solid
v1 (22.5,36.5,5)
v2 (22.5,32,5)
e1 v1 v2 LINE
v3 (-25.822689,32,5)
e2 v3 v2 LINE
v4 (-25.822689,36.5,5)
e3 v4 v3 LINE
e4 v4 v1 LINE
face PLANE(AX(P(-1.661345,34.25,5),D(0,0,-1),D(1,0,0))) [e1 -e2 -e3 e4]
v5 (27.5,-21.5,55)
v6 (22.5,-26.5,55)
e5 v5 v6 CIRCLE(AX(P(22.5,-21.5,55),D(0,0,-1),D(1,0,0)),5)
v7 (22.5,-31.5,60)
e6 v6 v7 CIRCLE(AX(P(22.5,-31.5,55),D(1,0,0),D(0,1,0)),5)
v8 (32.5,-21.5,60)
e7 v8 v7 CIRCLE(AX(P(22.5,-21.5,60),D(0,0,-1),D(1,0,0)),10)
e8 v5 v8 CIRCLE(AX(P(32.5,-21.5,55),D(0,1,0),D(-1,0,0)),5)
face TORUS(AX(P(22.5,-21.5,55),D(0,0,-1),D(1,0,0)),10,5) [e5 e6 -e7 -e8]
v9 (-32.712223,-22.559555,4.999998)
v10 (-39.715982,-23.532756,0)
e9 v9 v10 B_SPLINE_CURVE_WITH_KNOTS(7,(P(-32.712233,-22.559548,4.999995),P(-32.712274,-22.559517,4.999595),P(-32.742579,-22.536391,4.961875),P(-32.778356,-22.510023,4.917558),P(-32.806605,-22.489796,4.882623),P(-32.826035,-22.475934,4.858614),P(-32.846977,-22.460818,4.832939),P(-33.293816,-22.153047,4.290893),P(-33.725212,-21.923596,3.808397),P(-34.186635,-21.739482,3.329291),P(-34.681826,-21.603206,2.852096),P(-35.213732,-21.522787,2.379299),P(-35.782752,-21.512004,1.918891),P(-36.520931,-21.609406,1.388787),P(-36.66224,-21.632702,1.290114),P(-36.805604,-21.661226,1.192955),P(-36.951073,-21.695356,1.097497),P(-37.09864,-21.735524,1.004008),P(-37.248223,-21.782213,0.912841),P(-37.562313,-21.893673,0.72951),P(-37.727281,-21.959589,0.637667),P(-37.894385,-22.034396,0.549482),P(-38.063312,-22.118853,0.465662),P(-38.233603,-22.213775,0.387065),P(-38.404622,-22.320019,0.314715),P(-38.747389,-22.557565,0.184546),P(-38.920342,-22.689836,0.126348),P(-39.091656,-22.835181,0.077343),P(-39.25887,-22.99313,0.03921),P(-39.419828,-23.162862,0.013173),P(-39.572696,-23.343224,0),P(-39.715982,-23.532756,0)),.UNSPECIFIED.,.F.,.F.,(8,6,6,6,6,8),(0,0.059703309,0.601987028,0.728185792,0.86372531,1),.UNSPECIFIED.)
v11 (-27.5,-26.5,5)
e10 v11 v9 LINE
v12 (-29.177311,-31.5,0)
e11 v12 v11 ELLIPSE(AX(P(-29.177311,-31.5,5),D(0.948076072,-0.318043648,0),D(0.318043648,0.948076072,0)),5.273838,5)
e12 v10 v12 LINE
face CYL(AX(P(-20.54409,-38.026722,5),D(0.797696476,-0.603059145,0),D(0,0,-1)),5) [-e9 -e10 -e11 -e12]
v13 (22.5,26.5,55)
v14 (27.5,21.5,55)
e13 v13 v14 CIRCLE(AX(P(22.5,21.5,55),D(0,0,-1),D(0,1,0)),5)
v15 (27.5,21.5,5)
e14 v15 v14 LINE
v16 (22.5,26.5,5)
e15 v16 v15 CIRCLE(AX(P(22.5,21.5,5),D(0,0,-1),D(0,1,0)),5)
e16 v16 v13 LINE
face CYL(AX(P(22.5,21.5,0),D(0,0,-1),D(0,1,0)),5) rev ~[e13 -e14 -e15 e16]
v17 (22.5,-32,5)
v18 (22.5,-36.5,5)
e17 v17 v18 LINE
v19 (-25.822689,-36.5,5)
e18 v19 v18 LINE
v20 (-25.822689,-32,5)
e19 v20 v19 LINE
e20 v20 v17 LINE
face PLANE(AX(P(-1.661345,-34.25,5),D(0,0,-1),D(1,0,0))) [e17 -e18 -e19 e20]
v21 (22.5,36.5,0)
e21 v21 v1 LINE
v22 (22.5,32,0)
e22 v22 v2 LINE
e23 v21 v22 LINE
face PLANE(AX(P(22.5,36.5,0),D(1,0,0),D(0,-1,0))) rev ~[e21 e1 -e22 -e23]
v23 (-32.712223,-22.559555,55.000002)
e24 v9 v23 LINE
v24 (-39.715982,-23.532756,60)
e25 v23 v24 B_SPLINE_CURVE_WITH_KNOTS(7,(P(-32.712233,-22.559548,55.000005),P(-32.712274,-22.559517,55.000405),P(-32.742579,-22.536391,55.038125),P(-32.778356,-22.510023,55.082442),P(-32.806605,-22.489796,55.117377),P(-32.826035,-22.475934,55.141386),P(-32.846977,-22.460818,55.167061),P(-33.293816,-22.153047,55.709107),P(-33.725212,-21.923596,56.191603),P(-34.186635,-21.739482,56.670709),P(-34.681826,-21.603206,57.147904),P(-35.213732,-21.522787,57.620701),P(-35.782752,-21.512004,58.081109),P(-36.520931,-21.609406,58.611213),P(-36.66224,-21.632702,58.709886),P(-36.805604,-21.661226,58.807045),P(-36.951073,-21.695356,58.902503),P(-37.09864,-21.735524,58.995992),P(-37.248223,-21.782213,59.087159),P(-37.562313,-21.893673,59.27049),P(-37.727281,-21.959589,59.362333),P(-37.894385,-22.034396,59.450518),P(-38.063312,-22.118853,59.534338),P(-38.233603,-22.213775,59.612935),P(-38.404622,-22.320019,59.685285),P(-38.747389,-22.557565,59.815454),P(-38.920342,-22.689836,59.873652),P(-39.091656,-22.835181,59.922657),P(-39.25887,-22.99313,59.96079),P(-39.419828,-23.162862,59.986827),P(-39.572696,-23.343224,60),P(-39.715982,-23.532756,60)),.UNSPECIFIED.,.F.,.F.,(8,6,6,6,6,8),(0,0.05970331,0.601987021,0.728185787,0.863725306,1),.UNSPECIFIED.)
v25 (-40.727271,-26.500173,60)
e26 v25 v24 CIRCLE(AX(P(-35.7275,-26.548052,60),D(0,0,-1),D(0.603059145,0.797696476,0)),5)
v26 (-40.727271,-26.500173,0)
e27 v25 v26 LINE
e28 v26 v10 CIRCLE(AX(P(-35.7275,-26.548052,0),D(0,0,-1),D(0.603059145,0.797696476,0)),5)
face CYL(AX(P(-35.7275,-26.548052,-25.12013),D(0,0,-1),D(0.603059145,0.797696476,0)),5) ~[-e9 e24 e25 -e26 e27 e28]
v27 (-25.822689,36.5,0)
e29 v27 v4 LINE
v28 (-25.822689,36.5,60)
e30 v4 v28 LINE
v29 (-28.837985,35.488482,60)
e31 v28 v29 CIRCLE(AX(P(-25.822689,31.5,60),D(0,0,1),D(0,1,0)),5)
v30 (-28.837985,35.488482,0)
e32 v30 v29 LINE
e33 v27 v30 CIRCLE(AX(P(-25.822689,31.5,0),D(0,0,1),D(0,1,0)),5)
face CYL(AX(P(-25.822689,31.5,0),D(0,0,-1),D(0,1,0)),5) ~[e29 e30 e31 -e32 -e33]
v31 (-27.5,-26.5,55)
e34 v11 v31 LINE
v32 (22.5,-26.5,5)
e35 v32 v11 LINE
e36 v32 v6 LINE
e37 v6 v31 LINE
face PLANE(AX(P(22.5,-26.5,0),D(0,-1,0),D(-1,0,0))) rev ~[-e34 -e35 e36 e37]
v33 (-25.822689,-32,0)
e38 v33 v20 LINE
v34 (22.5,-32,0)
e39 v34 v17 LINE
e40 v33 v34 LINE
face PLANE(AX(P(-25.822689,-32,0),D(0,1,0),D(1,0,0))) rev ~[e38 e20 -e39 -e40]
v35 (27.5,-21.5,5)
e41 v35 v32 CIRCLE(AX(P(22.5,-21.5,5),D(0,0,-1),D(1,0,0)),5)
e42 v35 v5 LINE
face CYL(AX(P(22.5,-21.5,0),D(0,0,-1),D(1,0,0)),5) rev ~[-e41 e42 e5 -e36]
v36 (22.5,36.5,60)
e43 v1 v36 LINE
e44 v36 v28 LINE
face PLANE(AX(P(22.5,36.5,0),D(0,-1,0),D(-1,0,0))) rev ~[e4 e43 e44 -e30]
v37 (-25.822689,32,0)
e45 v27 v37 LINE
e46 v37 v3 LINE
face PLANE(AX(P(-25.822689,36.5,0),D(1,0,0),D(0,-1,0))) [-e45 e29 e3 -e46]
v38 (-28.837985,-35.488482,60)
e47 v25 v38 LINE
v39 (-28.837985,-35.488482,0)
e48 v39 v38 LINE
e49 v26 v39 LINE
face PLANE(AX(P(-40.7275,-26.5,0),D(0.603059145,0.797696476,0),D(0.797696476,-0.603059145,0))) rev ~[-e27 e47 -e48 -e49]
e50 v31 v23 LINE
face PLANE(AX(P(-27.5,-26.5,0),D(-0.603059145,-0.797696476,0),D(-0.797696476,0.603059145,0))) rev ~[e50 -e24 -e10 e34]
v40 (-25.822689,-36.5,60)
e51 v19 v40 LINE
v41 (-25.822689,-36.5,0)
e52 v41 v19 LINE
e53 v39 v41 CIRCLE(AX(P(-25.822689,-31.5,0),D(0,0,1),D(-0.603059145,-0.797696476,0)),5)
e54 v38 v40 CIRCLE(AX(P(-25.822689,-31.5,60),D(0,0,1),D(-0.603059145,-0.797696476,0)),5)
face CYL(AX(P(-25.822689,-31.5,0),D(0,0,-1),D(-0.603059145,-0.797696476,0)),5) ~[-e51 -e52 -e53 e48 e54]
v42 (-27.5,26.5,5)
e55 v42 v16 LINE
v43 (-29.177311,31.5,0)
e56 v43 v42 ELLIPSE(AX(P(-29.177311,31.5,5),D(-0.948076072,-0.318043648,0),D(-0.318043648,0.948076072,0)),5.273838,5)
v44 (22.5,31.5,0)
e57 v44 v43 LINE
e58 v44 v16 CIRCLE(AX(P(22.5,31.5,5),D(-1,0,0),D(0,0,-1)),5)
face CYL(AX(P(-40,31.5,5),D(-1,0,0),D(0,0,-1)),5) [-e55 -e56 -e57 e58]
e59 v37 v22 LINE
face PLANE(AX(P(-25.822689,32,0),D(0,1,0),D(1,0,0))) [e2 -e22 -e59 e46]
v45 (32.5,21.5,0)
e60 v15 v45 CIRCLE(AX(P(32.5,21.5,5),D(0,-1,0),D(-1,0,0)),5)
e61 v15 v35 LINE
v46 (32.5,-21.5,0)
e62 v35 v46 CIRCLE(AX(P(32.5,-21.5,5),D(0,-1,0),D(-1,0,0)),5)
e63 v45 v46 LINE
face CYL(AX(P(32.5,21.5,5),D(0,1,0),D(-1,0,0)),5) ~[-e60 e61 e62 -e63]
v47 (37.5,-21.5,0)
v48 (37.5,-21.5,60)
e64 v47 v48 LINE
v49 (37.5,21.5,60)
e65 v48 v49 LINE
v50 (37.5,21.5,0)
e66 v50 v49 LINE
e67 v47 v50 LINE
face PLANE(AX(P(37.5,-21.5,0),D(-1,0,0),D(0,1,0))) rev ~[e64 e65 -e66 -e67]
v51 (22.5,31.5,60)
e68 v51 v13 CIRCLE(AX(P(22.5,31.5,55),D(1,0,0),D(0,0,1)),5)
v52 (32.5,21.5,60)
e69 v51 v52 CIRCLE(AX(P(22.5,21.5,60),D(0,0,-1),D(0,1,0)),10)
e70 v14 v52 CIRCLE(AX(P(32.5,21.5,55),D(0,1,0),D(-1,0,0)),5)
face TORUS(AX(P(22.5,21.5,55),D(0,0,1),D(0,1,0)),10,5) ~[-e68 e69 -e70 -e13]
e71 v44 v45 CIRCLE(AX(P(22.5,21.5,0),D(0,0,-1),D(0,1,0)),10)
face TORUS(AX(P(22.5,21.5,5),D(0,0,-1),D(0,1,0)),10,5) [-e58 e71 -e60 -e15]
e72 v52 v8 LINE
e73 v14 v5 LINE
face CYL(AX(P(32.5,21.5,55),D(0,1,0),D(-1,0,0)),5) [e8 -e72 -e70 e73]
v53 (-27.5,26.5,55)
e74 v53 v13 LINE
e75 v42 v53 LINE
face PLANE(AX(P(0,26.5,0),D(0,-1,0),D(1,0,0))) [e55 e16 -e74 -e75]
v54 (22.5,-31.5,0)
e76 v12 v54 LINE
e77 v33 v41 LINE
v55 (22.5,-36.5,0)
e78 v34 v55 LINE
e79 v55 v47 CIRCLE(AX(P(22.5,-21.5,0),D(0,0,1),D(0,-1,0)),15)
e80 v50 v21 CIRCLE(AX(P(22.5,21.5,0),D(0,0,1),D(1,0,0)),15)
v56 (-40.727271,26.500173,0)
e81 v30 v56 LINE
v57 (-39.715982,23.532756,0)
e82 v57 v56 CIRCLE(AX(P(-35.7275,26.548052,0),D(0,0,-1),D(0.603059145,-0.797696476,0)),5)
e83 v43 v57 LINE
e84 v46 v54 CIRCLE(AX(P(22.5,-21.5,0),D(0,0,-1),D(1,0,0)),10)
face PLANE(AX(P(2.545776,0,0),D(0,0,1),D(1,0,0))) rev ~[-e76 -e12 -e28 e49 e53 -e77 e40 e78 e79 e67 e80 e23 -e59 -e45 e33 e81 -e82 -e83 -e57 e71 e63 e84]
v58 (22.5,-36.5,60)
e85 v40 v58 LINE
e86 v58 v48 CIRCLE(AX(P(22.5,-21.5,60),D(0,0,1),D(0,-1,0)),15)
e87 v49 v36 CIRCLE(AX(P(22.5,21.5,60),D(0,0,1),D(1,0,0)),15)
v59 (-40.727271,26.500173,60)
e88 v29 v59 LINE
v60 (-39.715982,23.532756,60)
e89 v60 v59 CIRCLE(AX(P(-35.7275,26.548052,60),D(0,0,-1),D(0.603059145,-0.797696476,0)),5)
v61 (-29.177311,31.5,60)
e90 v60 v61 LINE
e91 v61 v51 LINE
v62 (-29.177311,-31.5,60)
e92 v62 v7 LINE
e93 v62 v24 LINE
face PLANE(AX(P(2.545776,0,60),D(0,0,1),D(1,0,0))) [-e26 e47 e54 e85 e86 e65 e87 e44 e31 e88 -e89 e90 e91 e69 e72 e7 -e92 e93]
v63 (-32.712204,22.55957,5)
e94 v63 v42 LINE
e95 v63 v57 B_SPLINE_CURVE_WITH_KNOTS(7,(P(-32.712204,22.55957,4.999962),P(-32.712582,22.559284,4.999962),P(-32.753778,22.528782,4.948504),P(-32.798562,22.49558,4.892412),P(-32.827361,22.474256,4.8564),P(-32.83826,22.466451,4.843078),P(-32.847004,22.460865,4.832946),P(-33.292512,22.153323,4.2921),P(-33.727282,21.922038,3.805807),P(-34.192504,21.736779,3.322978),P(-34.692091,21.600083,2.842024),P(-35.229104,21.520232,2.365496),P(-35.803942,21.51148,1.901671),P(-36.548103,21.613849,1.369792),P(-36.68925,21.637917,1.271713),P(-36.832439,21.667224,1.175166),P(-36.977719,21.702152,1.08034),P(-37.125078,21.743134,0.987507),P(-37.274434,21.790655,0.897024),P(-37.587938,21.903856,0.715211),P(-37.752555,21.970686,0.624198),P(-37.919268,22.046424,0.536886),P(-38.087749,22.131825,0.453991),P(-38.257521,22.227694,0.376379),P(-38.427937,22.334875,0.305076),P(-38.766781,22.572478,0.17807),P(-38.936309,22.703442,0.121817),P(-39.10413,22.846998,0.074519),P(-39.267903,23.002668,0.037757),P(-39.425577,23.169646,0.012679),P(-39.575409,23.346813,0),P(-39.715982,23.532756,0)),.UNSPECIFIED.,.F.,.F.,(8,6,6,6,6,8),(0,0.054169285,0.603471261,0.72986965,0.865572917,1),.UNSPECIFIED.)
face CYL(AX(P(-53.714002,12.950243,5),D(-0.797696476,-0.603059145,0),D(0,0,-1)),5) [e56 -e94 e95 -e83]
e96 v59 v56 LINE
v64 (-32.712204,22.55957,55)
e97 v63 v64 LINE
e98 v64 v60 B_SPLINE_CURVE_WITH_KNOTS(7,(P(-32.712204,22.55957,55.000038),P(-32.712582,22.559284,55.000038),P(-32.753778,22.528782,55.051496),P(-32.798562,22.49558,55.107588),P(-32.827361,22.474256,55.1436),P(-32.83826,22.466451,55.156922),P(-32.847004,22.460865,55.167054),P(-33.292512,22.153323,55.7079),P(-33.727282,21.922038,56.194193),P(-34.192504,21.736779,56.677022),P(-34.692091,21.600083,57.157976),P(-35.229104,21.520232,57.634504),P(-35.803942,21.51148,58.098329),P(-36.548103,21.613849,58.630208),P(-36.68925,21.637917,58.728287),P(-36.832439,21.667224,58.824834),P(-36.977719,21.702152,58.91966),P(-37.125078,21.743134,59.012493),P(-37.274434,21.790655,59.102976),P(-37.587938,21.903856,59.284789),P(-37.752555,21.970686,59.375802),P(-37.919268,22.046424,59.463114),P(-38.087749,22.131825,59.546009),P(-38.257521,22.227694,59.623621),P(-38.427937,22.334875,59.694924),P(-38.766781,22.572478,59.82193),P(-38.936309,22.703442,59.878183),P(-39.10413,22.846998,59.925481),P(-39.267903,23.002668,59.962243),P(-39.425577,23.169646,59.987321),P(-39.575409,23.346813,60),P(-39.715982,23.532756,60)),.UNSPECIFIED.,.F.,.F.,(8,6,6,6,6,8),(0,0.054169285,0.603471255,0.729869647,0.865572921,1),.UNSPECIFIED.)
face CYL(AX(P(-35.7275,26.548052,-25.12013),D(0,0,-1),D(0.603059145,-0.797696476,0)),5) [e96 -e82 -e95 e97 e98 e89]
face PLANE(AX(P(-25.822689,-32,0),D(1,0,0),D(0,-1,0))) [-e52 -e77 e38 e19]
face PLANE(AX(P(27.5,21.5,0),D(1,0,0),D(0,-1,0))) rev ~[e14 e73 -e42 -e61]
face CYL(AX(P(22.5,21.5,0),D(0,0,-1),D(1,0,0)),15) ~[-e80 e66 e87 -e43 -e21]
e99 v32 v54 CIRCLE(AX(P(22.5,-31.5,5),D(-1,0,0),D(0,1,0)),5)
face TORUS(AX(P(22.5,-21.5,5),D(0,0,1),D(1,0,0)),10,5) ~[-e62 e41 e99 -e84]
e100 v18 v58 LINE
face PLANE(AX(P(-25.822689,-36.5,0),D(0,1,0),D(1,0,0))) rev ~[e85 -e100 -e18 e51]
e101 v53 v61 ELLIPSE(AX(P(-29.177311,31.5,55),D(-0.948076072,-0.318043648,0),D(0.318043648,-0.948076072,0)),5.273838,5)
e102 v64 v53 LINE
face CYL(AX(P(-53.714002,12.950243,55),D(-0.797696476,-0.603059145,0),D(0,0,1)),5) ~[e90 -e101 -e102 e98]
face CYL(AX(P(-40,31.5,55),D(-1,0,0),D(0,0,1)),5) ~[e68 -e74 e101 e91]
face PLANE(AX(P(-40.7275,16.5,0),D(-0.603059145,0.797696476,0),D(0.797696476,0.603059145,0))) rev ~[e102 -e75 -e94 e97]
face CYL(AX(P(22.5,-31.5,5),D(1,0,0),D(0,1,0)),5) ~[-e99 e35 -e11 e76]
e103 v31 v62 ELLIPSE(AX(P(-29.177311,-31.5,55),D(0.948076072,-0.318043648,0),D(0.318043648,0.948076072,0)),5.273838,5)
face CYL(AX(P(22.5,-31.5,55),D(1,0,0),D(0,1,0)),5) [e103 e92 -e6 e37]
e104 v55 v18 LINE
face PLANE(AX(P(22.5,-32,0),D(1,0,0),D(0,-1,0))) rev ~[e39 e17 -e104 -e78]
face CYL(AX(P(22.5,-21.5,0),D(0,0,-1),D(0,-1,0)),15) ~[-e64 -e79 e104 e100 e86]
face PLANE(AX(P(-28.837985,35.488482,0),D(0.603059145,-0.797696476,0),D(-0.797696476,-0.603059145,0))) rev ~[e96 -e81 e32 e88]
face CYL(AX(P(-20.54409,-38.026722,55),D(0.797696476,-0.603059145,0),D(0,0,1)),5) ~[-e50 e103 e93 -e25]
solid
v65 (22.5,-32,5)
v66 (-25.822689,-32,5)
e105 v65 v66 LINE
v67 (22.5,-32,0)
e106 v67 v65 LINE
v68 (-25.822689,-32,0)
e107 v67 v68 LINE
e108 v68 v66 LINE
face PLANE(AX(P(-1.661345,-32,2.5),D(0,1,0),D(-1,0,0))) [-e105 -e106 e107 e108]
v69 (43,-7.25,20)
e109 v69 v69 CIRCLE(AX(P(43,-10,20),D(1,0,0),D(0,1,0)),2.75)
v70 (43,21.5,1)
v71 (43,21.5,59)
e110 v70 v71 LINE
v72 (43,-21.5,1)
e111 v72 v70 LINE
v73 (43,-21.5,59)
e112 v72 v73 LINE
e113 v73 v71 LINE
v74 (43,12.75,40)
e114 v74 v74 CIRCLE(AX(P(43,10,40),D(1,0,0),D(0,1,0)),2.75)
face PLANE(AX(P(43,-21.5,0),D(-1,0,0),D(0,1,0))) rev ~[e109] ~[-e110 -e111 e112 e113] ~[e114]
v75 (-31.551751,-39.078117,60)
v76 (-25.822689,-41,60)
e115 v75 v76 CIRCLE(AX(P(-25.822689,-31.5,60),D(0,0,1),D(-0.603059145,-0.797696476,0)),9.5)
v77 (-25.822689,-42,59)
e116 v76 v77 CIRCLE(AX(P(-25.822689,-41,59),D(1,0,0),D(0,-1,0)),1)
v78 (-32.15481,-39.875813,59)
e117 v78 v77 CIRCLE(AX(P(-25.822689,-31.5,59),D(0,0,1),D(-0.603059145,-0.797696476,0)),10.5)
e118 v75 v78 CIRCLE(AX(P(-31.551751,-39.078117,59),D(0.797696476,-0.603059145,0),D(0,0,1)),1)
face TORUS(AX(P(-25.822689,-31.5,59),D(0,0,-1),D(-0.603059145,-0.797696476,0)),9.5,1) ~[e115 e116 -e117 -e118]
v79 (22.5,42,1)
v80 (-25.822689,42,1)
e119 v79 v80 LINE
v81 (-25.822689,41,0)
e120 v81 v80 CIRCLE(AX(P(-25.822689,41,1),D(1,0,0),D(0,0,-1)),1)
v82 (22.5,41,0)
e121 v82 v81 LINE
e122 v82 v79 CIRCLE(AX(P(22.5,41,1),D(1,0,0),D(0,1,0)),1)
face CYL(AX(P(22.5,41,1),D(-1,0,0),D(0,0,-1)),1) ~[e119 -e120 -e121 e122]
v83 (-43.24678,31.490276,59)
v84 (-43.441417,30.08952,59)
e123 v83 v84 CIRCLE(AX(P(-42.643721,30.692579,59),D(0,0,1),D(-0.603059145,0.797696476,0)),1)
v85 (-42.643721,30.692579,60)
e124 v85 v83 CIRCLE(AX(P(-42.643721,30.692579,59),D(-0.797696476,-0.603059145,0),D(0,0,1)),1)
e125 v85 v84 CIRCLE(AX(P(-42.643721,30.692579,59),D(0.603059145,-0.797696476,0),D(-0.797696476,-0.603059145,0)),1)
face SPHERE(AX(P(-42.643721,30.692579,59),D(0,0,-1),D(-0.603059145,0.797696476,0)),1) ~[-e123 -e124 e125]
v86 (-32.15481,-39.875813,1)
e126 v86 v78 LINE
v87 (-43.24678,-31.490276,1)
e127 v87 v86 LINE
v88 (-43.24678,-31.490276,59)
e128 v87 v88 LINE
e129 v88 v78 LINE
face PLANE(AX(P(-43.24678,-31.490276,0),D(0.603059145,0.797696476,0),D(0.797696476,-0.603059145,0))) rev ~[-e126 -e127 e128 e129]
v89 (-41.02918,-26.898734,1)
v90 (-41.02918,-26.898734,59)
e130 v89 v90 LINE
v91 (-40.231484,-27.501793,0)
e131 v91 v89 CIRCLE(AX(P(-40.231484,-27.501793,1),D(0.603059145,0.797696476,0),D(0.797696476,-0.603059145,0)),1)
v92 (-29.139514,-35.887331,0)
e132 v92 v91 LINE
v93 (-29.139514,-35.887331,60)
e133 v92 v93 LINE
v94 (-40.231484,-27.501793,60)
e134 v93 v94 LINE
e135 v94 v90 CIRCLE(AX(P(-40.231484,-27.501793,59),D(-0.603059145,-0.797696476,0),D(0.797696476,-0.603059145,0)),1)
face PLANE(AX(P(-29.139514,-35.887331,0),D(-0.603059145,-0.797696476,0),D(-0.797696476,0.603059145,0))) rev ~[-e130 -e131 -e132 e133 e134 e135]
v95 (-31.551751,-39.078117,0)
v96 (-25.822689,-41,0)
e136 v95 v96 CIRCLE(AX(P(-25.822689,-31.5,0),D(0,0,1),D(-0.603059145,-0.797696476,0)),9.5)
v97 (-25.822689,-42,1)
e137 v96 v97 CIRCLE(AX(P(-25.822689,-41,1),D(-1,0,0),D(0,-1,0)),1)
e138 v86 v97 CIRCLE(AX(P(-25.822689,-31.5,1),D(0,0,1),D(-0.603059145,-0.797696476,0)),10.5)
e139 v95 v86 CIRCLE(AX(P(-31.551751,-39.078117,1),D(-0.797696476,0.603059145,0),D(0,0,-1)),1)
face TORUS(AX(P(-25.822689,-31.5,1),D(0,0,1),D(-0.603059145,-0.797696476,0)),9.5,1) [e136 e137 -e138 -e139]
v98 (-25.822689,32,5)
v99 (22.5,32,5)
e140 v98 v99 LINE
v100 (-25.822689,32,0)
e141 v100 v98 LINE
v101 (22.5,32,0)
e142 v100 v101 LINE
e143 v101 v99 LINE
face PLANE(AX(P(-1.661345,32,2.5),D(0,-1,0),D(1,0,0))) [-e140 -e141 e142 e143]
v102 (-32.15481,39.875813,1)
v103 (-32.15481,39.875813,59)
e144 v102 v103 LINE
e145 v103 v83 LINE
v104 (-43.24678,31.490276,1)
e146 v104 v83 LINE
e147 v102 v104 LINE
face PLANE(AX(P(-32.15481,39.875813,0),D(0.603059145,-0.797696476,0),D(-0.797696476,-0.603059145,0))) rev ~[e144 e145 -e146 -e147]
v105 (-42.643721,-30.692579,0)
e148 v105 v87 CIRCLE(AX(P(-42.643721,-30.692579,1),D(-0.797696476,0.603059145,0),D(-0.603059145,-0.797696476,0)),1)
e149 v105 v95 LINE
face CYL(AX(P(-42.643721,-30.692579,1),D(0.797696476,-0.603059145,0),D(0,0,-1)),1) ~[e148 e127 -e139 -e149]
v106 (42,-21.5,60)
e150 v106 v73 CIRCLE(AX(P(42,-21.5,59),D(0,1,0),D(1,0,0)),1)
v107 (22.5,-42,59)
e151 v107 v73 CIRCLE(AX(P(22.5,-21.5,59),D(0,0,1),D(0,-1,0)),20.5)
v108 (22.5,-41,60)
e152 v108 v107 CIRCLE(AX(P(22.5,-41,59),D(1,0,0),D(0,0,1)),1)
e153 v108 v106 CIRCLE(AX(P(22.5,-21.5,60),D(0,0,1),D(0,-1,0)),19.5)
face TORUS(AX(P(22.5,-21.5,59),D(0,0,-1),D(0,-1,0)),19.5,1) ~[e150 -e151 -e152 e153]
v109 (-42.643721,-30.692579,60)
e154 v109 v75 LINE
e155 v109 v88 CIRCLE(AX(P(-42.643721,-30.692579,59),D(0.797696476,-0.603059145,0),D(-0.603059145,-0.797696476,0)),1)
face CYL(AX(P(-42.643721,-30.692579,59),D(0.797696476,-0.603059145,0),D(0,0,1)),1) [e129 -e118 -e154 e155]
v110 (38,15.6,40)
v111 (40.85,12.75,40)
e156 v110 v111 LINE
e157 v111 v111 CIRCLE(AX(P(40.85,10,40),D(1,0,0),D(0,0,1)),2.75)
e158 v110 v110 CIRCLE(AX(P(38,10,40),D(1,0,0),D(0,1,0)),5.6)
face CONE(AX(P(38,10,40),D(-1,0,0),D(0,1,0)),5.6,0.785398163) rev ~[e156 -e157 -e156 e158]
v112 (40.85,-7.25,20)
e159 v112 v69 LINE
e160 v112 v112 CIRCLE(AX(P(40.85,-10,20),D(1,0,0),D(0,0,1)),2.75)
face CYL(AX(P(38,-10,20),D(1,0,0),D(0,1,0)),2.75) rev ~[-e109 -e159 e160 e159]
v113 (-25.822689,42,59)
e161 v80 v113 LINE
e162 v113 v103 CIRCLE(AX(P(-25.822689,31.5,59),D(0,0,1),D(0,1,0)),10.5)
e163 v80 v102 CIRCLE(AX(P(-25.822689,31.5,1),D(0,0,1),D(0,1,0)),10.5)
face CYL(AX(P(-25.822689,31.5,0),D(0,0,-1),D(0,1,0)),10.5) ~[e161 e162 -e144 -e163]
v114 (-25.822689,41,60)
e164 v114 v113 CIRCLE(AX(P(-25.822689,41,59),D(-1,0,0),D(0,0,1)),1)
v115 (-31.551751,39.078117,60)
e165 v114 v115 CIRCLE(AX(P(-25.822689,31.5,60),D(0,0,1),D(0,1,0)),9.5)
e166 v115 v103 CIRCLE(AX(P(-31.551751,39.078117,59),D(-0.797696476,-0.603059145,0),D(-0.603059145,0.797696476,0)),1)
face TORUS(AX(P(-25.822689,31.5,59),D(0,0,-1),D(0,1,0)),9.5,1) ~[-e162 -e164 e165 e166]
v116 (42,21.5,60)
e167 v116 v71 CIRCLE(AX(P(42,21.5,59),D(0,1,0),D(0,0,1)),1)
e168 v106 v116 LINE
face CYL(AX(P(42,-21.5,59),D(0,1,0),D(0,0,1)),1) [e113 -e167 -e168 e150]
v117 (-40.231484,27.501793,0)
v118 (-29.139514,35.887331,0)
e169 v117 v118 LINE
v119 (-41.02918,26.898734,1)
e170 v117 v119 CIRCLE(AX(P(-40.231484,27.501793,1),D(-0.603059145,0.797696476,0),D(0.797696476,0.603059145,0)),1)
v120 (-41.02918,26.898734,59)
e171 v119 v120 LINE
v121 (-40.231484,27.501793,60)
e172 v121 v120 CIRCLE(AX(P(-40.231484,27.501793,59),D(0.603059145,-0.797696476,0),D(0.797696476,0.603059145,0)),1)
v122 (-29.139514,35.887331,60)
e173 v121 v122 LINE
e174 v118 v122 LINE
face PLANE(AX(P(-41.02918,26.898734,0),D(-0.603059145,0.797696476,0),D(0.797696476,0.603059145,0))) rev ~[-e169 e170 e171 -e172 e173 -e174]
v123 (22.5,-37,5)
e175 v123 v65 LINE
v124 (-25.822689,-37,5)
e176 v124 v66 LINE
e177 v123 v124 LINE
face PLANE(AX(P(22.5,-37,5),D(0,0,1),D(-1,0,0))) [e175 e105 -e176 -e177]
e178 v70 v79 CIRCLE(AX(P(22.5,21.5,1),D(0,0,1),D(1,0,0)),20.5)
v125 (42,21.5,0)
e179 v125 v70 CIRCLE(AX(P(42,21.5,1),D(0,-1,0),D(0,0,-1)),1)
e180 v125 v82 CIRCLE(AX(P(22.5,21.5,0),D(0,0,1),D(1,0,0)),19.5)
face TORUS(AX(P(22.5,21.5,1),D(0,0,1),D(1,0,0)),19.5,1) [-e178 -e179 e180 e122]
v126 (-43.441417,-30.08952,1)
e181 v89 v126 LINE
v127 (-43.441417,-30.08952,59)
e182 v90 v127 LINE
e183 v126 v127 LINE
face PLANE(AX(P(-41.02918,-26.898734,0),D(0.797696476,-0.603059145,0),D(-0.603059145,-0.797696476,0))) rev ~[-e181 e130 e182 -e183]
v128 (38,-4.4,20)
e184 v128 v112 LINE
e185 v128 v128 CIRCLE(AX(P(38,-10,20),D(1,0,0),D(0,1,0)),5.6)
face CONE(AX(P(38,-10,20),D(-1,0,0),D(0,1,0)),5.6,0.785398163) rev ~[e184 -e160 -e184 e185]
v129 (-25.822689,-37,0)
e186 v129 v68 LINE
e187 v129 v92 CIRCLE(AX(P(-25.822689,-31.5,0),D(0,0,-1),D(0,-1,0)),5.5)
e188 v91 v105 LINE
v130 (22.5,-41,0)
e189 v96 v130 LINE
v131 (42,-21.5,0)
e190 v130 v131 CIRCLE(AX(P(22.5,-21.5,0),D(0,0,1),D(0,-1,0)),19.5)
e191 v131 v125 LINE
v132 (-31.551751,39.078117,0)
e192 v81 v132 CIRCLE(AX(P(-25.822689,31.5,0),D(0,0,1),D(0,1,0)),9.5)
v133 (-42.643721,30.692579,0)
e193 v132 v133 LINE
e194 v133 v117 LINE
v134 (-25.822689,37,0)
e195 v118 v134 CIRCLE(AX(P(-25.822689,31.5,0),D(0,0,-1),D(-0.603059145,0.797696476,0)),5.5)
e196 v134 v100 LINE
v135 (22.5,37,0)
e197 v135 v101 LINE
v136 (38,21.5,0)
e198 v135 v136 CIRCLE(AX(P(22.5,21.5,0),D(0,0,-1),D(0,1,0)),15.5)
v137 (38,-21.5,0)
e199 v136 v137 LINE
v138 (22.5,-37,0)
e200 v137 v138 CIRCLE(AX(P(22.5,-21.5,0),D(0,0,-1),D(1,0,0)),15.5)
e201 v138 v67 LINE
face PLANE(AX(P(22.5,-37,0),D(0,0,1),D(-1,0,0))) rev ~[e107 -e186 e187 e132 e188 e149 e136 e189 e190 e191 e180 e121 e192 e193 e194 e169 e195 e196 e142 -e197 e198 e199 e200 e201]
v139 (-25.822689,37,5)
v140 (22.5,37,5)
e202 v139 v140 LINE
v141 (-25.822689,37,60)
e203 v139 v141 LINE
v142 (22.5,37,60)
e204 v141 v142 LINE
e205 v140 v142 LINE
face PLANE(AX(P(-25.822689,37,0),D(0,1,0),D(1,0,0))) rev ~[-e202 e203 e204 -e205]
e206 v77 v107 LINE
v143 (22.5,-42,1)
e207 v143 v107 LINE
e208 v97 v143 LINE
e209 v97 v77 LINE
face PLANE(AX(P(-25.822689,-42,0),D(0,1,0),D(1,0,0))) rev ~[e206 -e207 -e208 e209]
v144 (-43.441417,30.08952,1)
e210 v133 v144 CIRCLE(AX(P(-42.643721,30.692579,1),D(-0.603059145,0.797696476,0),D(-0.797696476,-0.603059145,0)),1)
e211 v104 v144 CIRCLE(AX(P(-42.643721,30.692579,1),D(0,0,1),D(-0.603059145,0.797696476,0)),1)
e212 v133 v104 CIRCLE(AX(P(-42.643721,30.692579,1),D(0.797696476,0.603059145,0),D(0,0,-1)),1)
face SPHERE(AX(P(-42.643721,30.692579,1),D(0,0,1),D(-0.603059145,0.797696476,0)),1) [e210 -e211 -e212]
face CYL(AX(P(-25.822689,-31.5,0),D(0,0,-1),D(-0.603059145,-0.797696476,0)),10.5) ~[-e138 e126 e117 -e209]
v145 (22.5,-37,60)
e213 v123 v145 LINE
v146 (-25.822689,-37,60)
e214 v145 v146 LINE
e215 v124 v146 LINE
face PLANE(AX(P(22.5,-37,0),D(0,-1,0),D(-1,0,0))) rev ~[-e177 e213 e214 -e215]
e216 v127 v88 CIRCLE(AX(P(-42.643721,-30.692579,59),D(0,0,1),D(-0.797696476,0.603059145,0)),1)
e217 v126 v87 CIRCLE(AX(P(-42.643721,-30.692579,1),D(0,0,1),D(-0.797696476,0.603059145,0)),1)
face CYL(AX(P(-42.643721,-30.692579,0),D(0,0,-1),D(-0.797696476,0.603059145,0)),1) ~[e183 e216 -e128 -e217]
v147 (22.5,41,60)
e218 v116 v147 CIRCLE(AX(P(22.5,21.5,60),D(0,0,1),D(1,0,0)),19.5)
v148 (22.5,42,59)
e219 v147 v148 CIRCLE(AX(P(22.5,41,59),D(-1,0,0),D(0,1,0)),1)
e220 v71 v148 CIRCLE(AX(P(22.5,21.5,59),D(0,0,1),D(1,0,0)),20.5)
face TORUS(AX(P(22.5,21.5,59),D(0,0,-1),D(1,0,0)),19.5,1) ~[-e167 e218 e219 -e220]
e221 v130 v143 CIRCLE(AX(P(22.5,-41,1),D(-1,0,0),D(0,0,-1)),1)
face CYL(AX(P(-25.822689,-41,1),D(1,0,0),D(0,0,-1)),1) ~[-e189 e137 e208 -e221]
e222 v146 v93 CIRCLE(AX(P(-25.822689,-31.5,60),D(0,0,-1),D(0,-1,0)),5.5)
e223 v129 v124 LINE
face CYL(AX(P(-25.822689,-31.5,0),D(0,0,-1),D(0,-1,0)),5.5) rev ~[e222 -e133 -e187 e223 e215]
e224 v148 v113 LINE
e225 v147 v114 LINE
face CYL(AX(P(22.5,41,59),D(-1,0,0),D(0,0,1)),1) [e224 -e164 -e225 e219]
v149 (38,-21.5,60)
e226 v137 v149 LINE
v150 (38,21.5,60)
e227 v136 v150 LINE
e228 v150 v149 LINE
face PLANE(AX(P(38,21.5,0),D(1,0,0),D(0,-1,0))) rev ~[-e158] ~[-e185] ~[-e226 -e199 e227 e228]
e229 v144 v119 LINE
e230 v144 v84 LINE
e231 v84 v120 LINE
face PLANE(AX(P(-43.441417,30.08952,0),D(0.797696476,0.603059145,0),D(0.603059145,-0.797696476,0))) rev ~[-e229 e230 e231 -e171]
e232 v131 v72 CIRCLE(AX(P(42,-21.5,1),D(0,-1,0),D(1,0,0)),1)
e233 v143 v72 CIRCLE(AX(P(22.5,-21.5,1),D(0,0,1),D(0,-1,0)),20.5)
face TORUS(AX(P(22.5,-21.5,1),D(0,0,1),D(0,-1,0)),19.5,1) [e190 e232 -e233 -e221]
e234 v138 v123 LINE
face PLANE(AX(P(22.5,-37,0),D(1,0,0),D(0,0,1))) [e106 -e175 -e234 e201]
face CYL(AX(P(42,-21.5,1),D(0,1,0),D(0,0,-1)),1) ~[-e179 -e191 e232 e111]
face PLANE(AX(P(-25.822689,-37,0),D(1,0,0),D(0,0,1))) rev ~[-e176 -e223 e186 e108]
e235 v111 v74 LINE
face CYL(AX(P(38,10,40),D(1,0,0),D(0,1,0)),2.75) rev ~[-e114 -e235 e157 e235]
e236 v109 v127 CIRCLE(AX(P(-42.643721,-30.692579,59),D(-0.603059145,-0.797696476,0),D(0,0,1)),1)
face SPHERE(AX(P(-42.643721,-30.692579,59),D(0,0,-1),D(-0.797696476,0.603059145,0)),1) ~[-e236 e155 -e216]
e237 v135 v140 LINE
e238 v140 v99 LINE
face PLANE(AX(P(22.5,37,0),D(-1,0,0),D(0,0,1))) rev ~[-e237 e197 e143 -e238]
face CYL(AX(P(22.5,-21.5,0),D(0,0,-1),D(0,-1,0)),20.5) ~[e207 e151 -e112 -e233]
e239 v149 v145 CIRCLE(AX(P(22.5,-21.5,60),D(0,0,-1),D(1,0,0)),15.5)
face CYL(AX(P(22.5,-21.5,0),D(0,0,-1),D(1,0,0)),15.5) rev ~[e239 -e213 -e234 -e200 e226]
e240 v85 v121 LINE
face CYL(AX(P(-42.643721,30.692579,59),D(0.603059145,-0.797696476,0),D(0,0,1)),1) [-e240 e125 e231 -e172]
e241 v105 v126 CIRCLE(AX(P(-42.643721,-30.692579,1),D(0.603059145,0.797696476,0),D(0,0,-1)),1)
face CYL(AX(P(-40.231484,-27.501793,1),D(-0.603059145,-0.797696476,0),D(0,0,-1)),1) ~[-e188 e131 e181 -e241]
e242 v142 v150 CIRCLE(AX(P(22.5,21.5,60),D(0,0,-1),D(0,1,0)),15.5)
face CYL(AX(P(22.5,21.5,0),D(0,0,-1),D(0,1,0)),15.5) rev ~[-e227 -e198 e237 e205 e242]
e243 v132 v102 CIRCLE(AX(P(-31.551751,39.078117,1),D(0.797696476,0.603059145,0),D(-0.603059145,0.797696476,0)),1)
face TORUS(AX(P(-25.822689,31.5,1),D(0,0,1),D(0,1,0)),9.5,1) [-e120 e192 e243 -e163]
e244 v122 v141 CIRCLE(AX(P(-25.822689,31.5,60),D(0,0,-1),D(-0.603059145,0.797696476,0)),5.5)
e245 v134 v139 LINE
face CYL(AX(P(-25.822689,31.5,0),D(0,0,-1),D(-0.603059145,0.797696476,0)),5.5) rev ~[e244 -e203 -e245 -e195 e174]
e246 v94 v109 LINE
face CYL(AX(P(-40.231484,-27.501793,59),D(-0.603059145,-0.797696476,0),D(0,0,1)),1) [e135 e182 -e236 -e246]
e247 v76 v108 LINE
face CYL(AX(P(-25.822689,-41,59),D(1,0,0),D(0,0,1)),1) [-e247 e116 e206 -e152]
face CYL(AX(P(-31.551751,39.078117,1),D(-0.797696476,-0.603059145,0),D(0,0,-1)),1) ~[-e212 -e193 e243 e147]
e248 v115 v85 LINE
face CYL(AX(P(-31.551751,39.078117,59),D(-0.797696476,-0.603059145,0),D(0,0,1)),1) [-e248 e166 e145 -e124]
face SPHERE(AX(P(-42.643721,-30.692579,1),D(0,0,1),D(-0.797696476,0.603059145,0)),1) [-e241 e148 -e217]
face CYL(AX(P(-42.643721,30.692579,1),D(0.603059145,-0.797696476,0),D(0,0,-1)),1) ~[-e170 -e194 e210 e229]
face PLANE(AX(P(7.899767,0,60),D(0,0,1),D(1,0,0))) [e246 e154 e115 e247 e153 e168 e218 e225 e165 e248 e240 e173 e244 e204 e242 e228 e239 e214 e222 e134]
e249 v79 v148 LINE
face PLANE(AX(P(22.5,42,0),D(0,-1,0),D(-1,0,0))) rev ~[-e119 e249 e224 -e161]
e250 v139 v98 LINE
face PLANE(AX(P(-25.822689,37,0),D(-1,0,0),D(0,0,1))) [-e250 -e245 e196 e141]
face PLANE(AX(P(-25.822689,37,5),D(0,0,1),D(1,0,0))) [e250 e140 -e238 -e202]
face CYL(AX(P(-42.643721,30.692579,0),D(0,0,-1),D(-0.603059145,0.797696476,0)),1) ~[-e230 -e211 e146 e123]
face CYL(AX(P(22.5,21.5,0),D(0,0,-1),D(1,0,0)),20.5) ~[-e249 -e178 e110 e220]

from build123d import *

# Parameters (mm, degrees)
F1_DEPTH       = 60
F3_W           = 48.3226891947
F3_H           = 4.5
F4_DEPTH       = 5
F5_DEPTH       = 60
F6_T1_DEPTH    = 110.2402603275
F6_T3_DEPTH    = 43
F6_T8_DEPTH    = 41.582121483
F6_T13_DEPTH   = 62.5
F6_T18_DEPTH   = 41.582121483
F6_T23_DEPTH   = 41.582121483
F6_T28_DEPTH   = 41.582121483
F6_T33_DEPTH   = 62.5
F6_T36_ANGLE   = 90
F6_T38_ANGLE   = 90
F6_T42_DEPTH   = 62.5
F6_T45_ANGLE   = 90
F6_T49_DEPTH   = 62.5
F6_T52_ANGLE   = 90
F6_T57_DEPTH   = 41.582121483
F6_T61_DEPTH   = 62.5
F6_T68_DEPTH   = 62.5
F6_T72_DEPTH   = 41.582121483
F6_T79_DEPTH   = 62.5
F6_T83_DEPTH   = 41.582121483
F6_T90_DEPTH   = 62.5
F6_T94_DEPTH   = 41.582121483
F8_D           = 5.5
F8_DEPTH       = 12
F8_CSINK_D     = 11.2
F8_CSINK_ANGLE = 90
F8_TIP         = 1.6523667023
F9_W           = 48.3226891947
F9_H           = 5
F10_DEPTH      = 5
F11_W          = 48.3226891947
F11_H          = 5
F12_DEPTH      = 5
F13_R          = 1


# Not quite as in the source:
# - a fillet or chamfer that OpenCascade refuses, or shapes differently, is made with other operations: its cross-section is extruded or revolved along the edge and cut away or added


with BuildPart() as f1:
    # F0 (on Top) → F1 (new body)
    with BuildSketch(Plane.XY):
        with BuildLine():
            ThreePointArc((27.5, -21.5), (26.0355339059, -25.0355339059), (22.5, -26.5))
            Line((22.5, -26.5), (-27.5, -26.5))
            Line((-27.5, -26.5), (-40.7274998724, -16.5))
            Line((-40.7274998724, -16.5), (-40.7274998724, -26.5))
            Line((-40.7274998724, -26.5), (-28.8379849186, -35.4884823803))
            ThreePointArc((-28.8379849186, -35.4884823803), (-27.4129074343, -36.2403803593), (-25.8226891947, -36.5))
            Line((-25.8226891947, -36.5), (22.5, -36.5))
            ThreePointArc((22.5, -36.5), (33.1066017178, -32.1066017178), (37.5, -21.5))
            Line((37.5, -21.5), (37.5, 21.5))
            ThreePointArc((37.5, 21.5), (33.1066017178, 32.1066017178), (22.5, 36.5))
            Line((22.5, 36.5), (-25.8226891947, 36.5))
            ThreePointArc((-25.8226891947, 36.5), (-27.4129074343, 36.2403803593), (-28.8379849186, 35.4884823803))
            Line((-28.8379849186, 35.4884823803), (-40.7274998724, 26.5))
            Line((-40.7274998724, 26.5), (-40.7274998724, 16.5))
            Line((-40.7274998724, 16.5), (-27.5, 26.5))
            Line((-27.5, 26.5), (22.5, 26.5))
            ThreePointArc((22.5, 26.5), (26.0355339059, 25.0355339059), (27.5, 21.5))
            Line((27.5, 21.5), (27.5, -21.5))
        make_face()
    extrude(amount=F1_DEPTH)

    # F3 (on face) → F4 (cut)
    with BuildSketch(Plane(origin=(0, 0, 0), x_dir=(1, 0, 0), z_dir=(0, 0, -1))):
        with Locations((-1.6613445974, 34.25)):
            Rectangle(F3_W, F3_H)
        with Locations((-1.6613445974, -34.25)):
            Rectangle(F3_W, F3_H)
    extrude(amount=-F4_DEPTH, mode=Mode.SUBTRACT)

    # F6: fillet of radius 5 on 16 edges, made by hand

    # F6_s2 → F6_t1 (cut)
    with BuildSketch(Plane.XY.offset(-25.1201301638)):
        with BuildLine():
            ThreePointArc((-32.7122041486, 22.5595696852), (-37.9550008692, 22.0716428673), (-40.7274998724, 26.5480520655))
            Line((-40.7274998724, 26.5480520655), (-40.7274998724, 16.5))
            Line((-40.7274998724, 16.5), (-32.7122041486, 22.5595696852))
        make_face()
        with BuildLine():
            ThreePointArc((-32.7122041486, -22.5595696852), (-37.9550008692, -22.0716428673), (-40.7274998724, -26.5480520655))
            Line((-40.7274998724, -26.5480520655), (-40.7274998724, -16.5))
            Line((-40.7274998724, -16.5), (-32.7122041486, -22.5595696852))
        make_face()
    extrude(amount=F6_T1_DEPTH, mode=Mode.SUBTRACT)

    # F6_s4 → F6_t3 (cut)
    with BuildSketch(Plane.XZ.offset(-21.5)):
        with BuildLine():
            ThreePointArc((27.5, 5), (28.9644660941, 1.4644660941), (32.5, 0))
            Line((32.5, 0), (27.5, 0))
            Line((27.5, 0), (27.5, 5))
        make_face()
        with BuildLine():
            ThreePointArc((27.5, 55), (28.9644660941, 58.5355339059), (32.5, 60))
            Line((32.5, 60), (27.5, 60))
            Line((27.5, 60), (27.5, 55))
        make_face()
    extrude(amount=F6_T3_DEPTH, mode=Mode.SUBTRACT)


with BuildPart() as f5:
    # F2 (on Top) → F5 (new body)
    with BuildSketch(Plane.XY):
        with BuildLine():
            Line((-29.139514491, -35.8873306183), (-41.0291804666, -26.8987340655))
            Line((-41.0291804666, -26.8987340655), (-43.4414170456, -30.0895199697))
            ThreePointArc((-43.4414170456, -30.0895199697), (-43.6342043679, -30.8302084913), (-43.2467797144, -31.4902755905))
            Line((-43.2467797144, -31.4902755905), (-32.1548102148, -39.8758129986))
            ThreePointArc((-32.1548102148, -39.8758129986), (-29.1621474978, -41.4547987545), (-25.8226891947, -42))
            Line((-25.8226891947, -42), (22.5, -42))
            ThreePointArc((22.5, -42), (36.9956890143, -35.9956890143), (43, -21.5))
            Line((43, -21.5), (43, 21.5))
            ThreePointArc((43, 21.5), (36.9956890143, 35.9956890143), (22.5, 42))
            Line((22.5, 42), (-25.8226891947, 42))
            ThreePointArc((-25.8226891947, 42), (-29.1621474978, 41.4547987545), (-32.1548102148, 39.8758129986))
            Line((-32.1548102148, 39.8758129986), (-43.2467797144, 31.4902755905))
            ThreePointArc((-43.2467797144, 31.4902755905), (-43.6342043679, 30.8302084913), (-43.4414170456, 30.0895199697))
            Line((-43.4414170456, 30.0895199697), (-41.0291804666, 26.8987340655))
            Line((-41.0291804666, 26.8987340655), (-29.139514491, 35.8873306183))
            ThreePointArc((-29.139514491, 35.8873306183), (-27.5719292582, 36.7144183952), (-25.8226891947, 37))
            Line((-25.8226891947, 37), (22.5, 37))
            ThreePointArc((22.5, 37), (33.4601551084, 32.4601551084), (38, 21.5))
            Line((38, 21.5), (38, -21.5))
            ThreePointArc((38, -21.5), (33.4601551084, -32.4601551084), (22.5, -37))
            Line((22.5, -37), (-25.8226891947, -37))
            ThreePointArc((-25.8226891947, -37), (-27.5719292582, -36.7144183952), (-29.139514491, -35.8873306183))
        make_face()
    extrude(amount=F5_DEPTH)

    # F8
    with Locations(Plane(origin=(38, 0, 0), x_dir=(0, -1, 0), z_dir=(-1, 0, 0))):
        with Locations((-10, 40), (10, 20)):
            CounterSinkHole(F8_D / 2, F8_CSINK_D / 2, depth=F8_DEPTH, counter_sink_angle=F8_CSINK_ANGLE)
            with Locations((0, 0, -(F8_DEPTH + F8_TIP / 2))):  # 118° drill point
                Cone(0, F8_D / 2, F8_TIP, mode=Mode.SUBTRACT)

    # F9 (on face) → F10 (join)
    with BuildSketch(Plane.XZ.offset(-37)):
        with Locations((-1.6613445974, 2.5)):
            Rectangle(F9_W, F9_H)
    extrude(amount=F10_DEPTH)

    # F11 (on face) → F12 (join)
    with BuildSketch(Plane(origin=(0, -37, 0), x_dir=(-1, 0, 0), z_dir=(0, 1, 0))):
        with Locations((1.6613445974, 2.5)):
            Rectangle(F11_W, F11_H)
    extrude(amount=F12_DEPTH)

    # F13
    f13_edges = [f5.edges().sort_by_distance(p)[0] for p in [
        (-1.661345, 42, 60),
        (-37.700795, 35.683044, 0),
        (-42.235299, -28.494127, 0),
        (-42.235299, -28.494127, 60),
        (-43.634204, -30.830208, 0),
        (-37.700795, -35.683044, 0),
        (-29.162147, -41.454799, 0),
        (-1.661345, -42, 0),
        (36.995689, -35.995689, 0),
        (43, 0, 0),
        (36.995689, 35.995689, 0),
        (-1.661345, 42, 0),
        (-29.162147, 41.454799, 0),
        (-43.634204, 30.830208, 0),
        (-42.235299, 28.494127, 0),
        (-43.634204, -30.830208, 60),
        (-37.700795, -35.683044, 60),
        (-29.162147, -41.454799, 60),
        (-1.661345, -42, 60),
        (36.995689, -35.995689, 60),
        (43, 0, 60),
        (36.995689, 35.995689, 60),
        (-29.162147, 41.454799, 60),
        (-37.700795, 35.683044, 60),
        (-43.634204, 30.830208, 60),
        (-42.235299, 28.494127, 60),
    ]]
    fillet(f13_edges, radius=F13_R)


with BuildPart() as f6_tool6:
    # F6_s7 → F6_t8 (new body)
    with BuildSketch(Plane(origin=(-27.9494555927, -21.1298097617, 0), x_dir=(0, 0, 1), z_dir=(0.7976964761, 0.6030591448, 0))):
        with BuildLine():
            ThreePointArc((60, -42.7230830966), (58.5355339059, -39.1875491907), (55, -37.7230830966))
            Line((55, -37.7230830966), (60, -37.7230830966))
            Line((60, -37.7230830966), (60, -42.7230830966))
        make_face()
    extrude(amount=F6_T8_DEPTH)

    split(bisect_by=Plane.XZ.offset(-26.5), keep=Keep.TOP)


with BuildPart() as f1_1:
    add(f1.part)

    # F6_t5: cut F6_tool6
    add(f6_tool6.part, mode=Mode.SUBTRACT)


with BuildPart() as f6_tool11:
    # F6_s12 → F6_t13 (new body)
    with BuildSketch(Plane.YZ.offset(-40)):
        with BuildLine():
            ThreePointArc((31.5, 60), (27.9644660941, 58.5355339059), (26.5, 55))
            Line((26.5, 55), (26.5, 60))
            Line((26.5, 60), (31.5, 60))
        make_face()
    extrude(amount=F6_T13_DEPTH)

    split(bisect_by=Plane(origin=(-22.7492502304, 30.091570452, 0), x_dir=(0, 0, 1), z_dir=(0.6030591448, -0.7976964761, 0)), keep=Keep.TOP)


with BuildPart() as f1_2:
    add(f1_1.part)

    # F6_t10: cut F6_tool11
    add(f6_tool11.part, mode=Mode.SUBTRACT)


with BuildPart() as f6_tool16:
    # F6_s17 → F6_t18 (new body)
    with BuildSketch(Plane(origin=(5.220456181, -3.9466688576, 0), x_dir=(0, 0, 1), z_dir=(-0.7976964761, 0.6030591448, 0))):
        with BuildLine():
            ThreePointArc((60, -42.7230830966), (58.5355339059, -39.1875491907), (55, -37.7230830966))
            Line((55, -37.7230830966), (60, -37.7230830966))
            Line((60, -37.7230830966), (60, -42.7230830966))
        make_face()
    extrude(amount=F6_T18_DEPTH)

    split(bisect_by=Plane.XZ.offset(26.5), keep=Keep.BOTTOM)


with BuildPart() as f1_3:
    add(f1_2.part)

    # F6_t15: cut F6_tool16
    add(f6_tool16.part, mode=Mode.SUBTRACT)


with BuildPart() as f6_tool21:
    # F6_s22 → F6_t23 (new body)
    with BuildSketch(Plane(origin=(-27.9494555927, -21.1298097617, 0), x_dir=(0, 0, 1), z_dir=(0.7976964761, 0.6030591448, 0))):
        with BuildLine():
            ThreePointArc((0, -42.7230830966), (1.4644660941, -39.1875491907), (5, -37.7230830966))
            Line((5, -37.7230830966), (0, -37.7230830966))
            Line((0, -37.7230830966), (0, -42.7230830966))
        make_face()
    extrude(amount=F6_T23_DEPTH)

    split(bisect_by=Plane.XZ.offset(-26.5), keep=Keep.TOP)


with BuildPart() as f1_4:
    add(f1_3.part)

    # F6_t20: cut F6_tool21
    add(f6_tool21.part, mode=Mode.SUBTRACT)


with BuildPart() as f6_tool26:
    # F6_s27 → F6_t28 (new body)
    with BuildSketch(Plane(origin=(5.220456181, -3.9466688576, 0), x_dir=(0, 0, 1), z_dir=(-0.7976964761, 0.6030591448, 0))):
        with BuildLine():
            ThreePointArc((0, -42.7230830966), (1.4644660941, -39.1875491907), (5, -37.7230830966))
            Line((5, -37.7230830966), (0, -37.7230830966))
            Line((0, -37.7230830966), (0, -42.7230830966))
        make_face()
    extrude(amount=F6_T28_DEPTH)

    split(bisect_by=Plane.XZ.offset(26.5), keep=Keep.BOTTOM)


with BuildPart() as f1_5:
    add(f1_4.part)

    # F6_t25: cut F6_tool26
    add(f6_tool26.part, mode=Mode.SUBTRACT)


with BuildPart() as f6_tool31:
    # F6_s32 → F6_t33 (new body)
    with BuildSketch(Plane.YZ.offset(22.5)):
        with BuildLine():
            ThreePointArc((-26.5, 5), (-27.9644660941, 1.4644660941), (-31.5, 0))
            Line((-31.5, 0), (-26.5, 0))
            Line((-26.5, 0), (-26.5, 5))
        make_face()
    extrude(amount=-F6_T33_DEPTH)

    split(bisect_by=Plane(origin=(-22.7492502304, -30.091570452, 0), x_dir=(0, 0, 1), z_dir=(0.6030591448, 0.7976964761, 0)), keep=Keep.TOP)


with BuildPart() as f1_6:
    add(f1_5.part)

    # F6_t30: cut F6_tool31
    add(f6_tool31.part, mode=Mode.SUBTRACT)

    # F6_s35 → F6_t36 (revolve, cut)
    with BuildSketch(Plane.XZ.offset(21.5)):
        with BuildLine():
            ThreePointArc((27.5, 5), (28.9644660941, 1.4644660941), (32.5, 0))
            Line((32.5, 0), (27.5, 0))
            Line((27.5, 0), (27.5, 5))
        make_face()
    revolve(axis=Axis((22.5, -21.5, 0), (0, 0, -1)), revolution_arc=F6_T36_ANGLE, mode=Mode.SUBTRACT)

    # F6_s37 → F6_t38 (revolve, cut)
    with BuildSketch(Plane.XZ.offset(21.5)):
        with BuildLine():
            ThreePointArc((27.5, 55), (28.9644660941, 58.5355339059), (32.5, 60))
            Line((32.5, 60), (27.5, 60))
            Line((27.5, 60), (27.5, 55))
        make_face()
    revolve(axis=Axis((22.5, -21.5, 60), (0, 0, -1)), revolution_arc=F6_T38_ANGLE, mode=Mode.SUBTRACT)


with BuildPart() as f6_tool40:
    # F6_s41 → F6_t42 (new body)
    with BuildSketch(Plane.YZ.offset(22.5)):
        with BuildLine():
            ThreePointArc((-26.5, 55), (-27.9644660941, 58.5355339059), (-31.5, 60))
            Line((-31.5, 60), (-26.5, 60))
            Line((-26.5, 60), (-26.5, 55))
        make_face()
    extrude(amount=-F6_T42_DEPTH)

    split(bisect_by=Plane(origin=(-22.7492502304, -30.091570452, 0), x_dir=(0, 0, 1), z_dir=(0.6030591448, 0.7976964761, 0)), keep=Keep.TOP)


with BuildPart() as f1_7:
    add(f1_6.part)

    # F6_t39: cut F6_tool40
    add(f6_tool40.part, mode=Mode.SUBTRACT)

    # F6_s44 → F6_t45 (revolve, cut)
    with BuildSketch(Plane.YZ.offset(22.5)):
        with BuildLine():
            ThreePointArc((31.5, 0), (27.9644660941, 1.4644660941), (26.5, 5))
            Line((26.5, 5), (26.5, 0))
            Line((26.5, 0), (31.5, 0))
        make_face()
    revolve(axis=Axis((22.5, 21.5, 0), (0, 0, -1)), revolution_arc=F6_T45_ANGLE, mode=Mode.SUBTRACT)


with BuildPart() as f6_tool47:
    # F6_s48 → F6_t49 (new body)
    with BuildSketch(Plane.YZ.offset(-40)):
        with BuildLine():
            ThreePointArc((31.5, 0), (27.9644660941, 1.4644660941), (26.5, 5))
            Line((26.5, 5), (26.5, 0))
            Line((26.5, 0), (31.5, 0))
        make_face()
    extrude(amount=F6_T49_DEPTH)

    split(bisect_by=Plane(origin=(-22.7492502304, 30.091570452, 0), x_dir=(0, 0, 1), z_dir=(0.6030591448, -0.7976964761, 0)), keep=Keep.TOP)


with BuildPart() as f1_8:
    add(f1_7.part)

    # F6_t46: cut F6_tool47
    add(f6_tool47.part, mode=Mode.SUBTRACT)

    # F6_s51 → F6_t52 (revolve, cut)
    with BuildSketch(Plane.YZ.offset(22.5)):
        with BuildLine():
            ThreePointArc((31.5, 60), (27.9644660941, 58.5355339059), (26.5, 55))
            Line((26.5, 55), (26.5, 60))
            Line((26.5, 60), (31.5, 60))
        make_face()
    revolve(axis=Axis((22.5, 21.5, 60), (0, 0, -1)), revolution_arc=F6_T52_ANGLE, mode=Mode.SUBTRACT)


with BuildPart() as f6_tool55:
    # F6_s56 → F6_t57 (new body)
    with BuildSketch(Plane(origin=(-27.9494555927, -21.1298097617, 0), x_dir=(0, 0, 1), z_dir=(0.7976964761, 0.6030591448, 0))):
        with BuildLine():
            ThreePointArc((60, -42.7230830966), (58.5355339059, -39.1875491907), (55, -37.7230830966))
            Line((55, -37.7230830966), (60, -37.7230830966))
            Line((60, -37.7230830966), (60, -42.7230830966))
        make_face()
    extrude(amount=F6_T57_DEPTH)

    split(bisect_by=Plane.XZ.offset(-26.5), keep=Keep.BOTTOM)


with BuildPart() as f6_tool59:
    # F6_s60 → F6_t61 (new body)
    with BuildSketch(Plane.YZ.offset(-40)):
        with BuildLine():
            ThreePointArc((31.5, 60), (27.9644660941, 58.5355339059), (26.5, 55))
            Line((26.5, 55), (26.5, 60))
            Line((26.5, 60), (31.5, 60))
        make_face()
    extrude(amount=F6_T61_DEPTH)

    split(bisect_by=Plane(origin=(-22.7492502304, 30.091570452, 0), x_dir=(0, 0, 1), z_dir=(-0.6030591448, 0.7976964761, 0)), keep=Keep.TOP)


with BuildPart() as f6_tool55_1:
    add(f6_tool55.part)

    # F6_t63: intersect F6_tool59
    add(f6_tool59.part, mode=Mode.INTERSECT)


with BuildPart() as f1_9:
    add(f1_8.part)

    # F6_t53: cut F6_tool55
    add(f6_tool55_1.part, mode=Mode.SUBTRACT)


with BuildPart() as f6_tool66:
    # F6_s67 → F6_t68 (new body)
    with BuildSketch(Plane.YZ.offset(22.5)):
        with BuildLine():
            ThreePointArc((-26.5, 55), (-27.9644660941, 58.5355339059), (-31.5, 60))
            Line((-31.5, 60), (-26.5, 60))
            Line((-26.5, 60), (-26.5, 55))
        make_face()
    extrude(amount=-F6_T68_DEPTH)

    split(bisect_by=Plane(origin=(-22.7492502304, -30.091570452, 0), x_dir=(0, 0, 1), z_dir=(-0.6030591448, -0.7976964761, 0)), keep=Keep.TOP)


with BuildPart() as f6_tool70:
    # F6_s71 → F6_t72 (new body)
    with BuildSketch(Plane(origin=(5.220456181, -3.9466688576, 0), x_dir=(0, 0, 1), z_dir=(-0.7976964761, 0.6030591448, 0))):
        with BuildLine():
            ThreePointArc((60, -42.7230830966), (58.5355339059, -39.1875491907), (55, -37.7230830966))
            Line((55, -37.7230830966), (60, -37.7230830966))
            Line((60, -37.7230830966), (60, -42.7230830966))
        make_face()
    extrude(amount=F6_T72_DEPTH)

    split(bisect_by=Plane.XZ.offset(26.5), keep=Keep.TOP)


with BuildPart() as f6_tool66_1:
    add(f6_tool66.part)

    # F6_t74: intersect F6_tool70
    add(f6_tool70.part, mode=Mode.INTERSECT)


with BuildPart() as f1_10:
    add(f1_9.part)

    # F6_t64: cut F6_tool66
    add(f6_tool66_1.part, mode=Mode.SUBTRACT)


with BuildPart() as f6_tool77:
    # F6_s78 → F6_t79 (new body)
    with BuildSketch(Plane.YZ.offset(-40)):
        with BuildLine():
            ThreePointArc((31.5, 0), (27.9644660941, 1.4644660941), (26.5, 5))
            Line((26.5, 5), (26.5, 0))
            Line((26.5, 0), (31.5, 0))
        make_face()
    extrude(amount=F6_T79_DEPTH)

    split(bisect_by=Plane(origin=(-22.7492502304, 30.091570452, 0), x_dir=(0, 0, 1), z_dir=(-0.6030591448, 0.7976964761, 0)), keep=Keep.TOP)


with BuildPart() as f6_tool81:
    # F6_s82 → F6_t83 (new body)
    with BuildSketch(Plane(origin=(-27.9494555927, -21.1298097617, 0), x_dir=(0, 0, 1), z_dir=(0.7976964761, 0.6030591448, 0))):
        with BuildLine():
            ThreePointArc((0, -42.7230830966), (1.4644660941, -39.1875491907), (5, -37.7230830966))
            Line((5, -37.7230830966), (0, -37.7230830966))
            Line((0, -37.7230830966), (0, -42.7230830966))
        make_face()
    extrude(amount=F6_T83_DEPTH)

    split(bisect_by=Plane.XZ.offset(-26.5), keep=Keep.BOTTOM)


with BuildPart() as f6_tool77_1:
    add(f6_tool77.part)

    # F6_t85: intersect F6_tool81
    add(f6_tool81.part, mode=Mode.INTERSECT)


with BuildPart() as f1_11:
    add(f1_10.part)

    # F6_t75: cut F6_tool77
    add(f6_tool77_1.part, mode=Mode.SUBTRACT)


with BuildPart() as f6_tool88:
    # F6_s89 → F6_t90 (new body)
    with BuildSketch(Plane.YZ.offset(22.5)):
        with BuildLine():
            ThreePointArc((-26.5, 5), (-27.9644660941, 1.4644660941), (-31.5, 0))
            Line((-31.5, 0), (-26.5, 0))
            Line((-26.5, 0), (-26.5, 5))
        make_face()
    extrude(amount=-F6_T90_DEPTH)

    split(bisect_by=Plane(origin=(-22.7492502304, -30.091570452, 0), x_dir=(0, 0, 1), z_dir=(-0.6030591448, -0.7976964761, 0)), keep=Keep.TOP)


with BuildPart() as f6_tool92:
    # F6_s93 → F6_t94 (new body)
    with BuildSketch(Plane(origin=(5.220456181, -3.9466688576, 0), x_dir=(0, 0, 1), z_dir=(-0.7976964761, 0.6030591448, 0))):
        with BuildLine():
            ThreePointArc((0, -42.7230830966), (1.4644660941, -39.1875491907), (5, -37.7230830966))
            Line((5, -37.7230830966), (0, -37.7230830966))
            Line((0, -37.7230830966), (0, -42.7230830966))
        make_face()
    extrude(amount=F6_T94_DEPTH)

    split(bisect_by=Plane.XZ.offset(26.5), keep=Keep.TOP)


with BuildPart() as f6_tool88_1:
    add(f6_tool88.part)

    # F6_t96: intersect F6_tool92
    add(f6_tool92.part, mode=Mode.INTERSECT)


with BuildPart() as f1_12:
    add(f1_11.part)

    # F6_t86: cut F6_tool88
    add(f6_tool88_1.part, mode=Mode.SUBTRACT)


solid = Compound([f5.part, f1_12.part])
